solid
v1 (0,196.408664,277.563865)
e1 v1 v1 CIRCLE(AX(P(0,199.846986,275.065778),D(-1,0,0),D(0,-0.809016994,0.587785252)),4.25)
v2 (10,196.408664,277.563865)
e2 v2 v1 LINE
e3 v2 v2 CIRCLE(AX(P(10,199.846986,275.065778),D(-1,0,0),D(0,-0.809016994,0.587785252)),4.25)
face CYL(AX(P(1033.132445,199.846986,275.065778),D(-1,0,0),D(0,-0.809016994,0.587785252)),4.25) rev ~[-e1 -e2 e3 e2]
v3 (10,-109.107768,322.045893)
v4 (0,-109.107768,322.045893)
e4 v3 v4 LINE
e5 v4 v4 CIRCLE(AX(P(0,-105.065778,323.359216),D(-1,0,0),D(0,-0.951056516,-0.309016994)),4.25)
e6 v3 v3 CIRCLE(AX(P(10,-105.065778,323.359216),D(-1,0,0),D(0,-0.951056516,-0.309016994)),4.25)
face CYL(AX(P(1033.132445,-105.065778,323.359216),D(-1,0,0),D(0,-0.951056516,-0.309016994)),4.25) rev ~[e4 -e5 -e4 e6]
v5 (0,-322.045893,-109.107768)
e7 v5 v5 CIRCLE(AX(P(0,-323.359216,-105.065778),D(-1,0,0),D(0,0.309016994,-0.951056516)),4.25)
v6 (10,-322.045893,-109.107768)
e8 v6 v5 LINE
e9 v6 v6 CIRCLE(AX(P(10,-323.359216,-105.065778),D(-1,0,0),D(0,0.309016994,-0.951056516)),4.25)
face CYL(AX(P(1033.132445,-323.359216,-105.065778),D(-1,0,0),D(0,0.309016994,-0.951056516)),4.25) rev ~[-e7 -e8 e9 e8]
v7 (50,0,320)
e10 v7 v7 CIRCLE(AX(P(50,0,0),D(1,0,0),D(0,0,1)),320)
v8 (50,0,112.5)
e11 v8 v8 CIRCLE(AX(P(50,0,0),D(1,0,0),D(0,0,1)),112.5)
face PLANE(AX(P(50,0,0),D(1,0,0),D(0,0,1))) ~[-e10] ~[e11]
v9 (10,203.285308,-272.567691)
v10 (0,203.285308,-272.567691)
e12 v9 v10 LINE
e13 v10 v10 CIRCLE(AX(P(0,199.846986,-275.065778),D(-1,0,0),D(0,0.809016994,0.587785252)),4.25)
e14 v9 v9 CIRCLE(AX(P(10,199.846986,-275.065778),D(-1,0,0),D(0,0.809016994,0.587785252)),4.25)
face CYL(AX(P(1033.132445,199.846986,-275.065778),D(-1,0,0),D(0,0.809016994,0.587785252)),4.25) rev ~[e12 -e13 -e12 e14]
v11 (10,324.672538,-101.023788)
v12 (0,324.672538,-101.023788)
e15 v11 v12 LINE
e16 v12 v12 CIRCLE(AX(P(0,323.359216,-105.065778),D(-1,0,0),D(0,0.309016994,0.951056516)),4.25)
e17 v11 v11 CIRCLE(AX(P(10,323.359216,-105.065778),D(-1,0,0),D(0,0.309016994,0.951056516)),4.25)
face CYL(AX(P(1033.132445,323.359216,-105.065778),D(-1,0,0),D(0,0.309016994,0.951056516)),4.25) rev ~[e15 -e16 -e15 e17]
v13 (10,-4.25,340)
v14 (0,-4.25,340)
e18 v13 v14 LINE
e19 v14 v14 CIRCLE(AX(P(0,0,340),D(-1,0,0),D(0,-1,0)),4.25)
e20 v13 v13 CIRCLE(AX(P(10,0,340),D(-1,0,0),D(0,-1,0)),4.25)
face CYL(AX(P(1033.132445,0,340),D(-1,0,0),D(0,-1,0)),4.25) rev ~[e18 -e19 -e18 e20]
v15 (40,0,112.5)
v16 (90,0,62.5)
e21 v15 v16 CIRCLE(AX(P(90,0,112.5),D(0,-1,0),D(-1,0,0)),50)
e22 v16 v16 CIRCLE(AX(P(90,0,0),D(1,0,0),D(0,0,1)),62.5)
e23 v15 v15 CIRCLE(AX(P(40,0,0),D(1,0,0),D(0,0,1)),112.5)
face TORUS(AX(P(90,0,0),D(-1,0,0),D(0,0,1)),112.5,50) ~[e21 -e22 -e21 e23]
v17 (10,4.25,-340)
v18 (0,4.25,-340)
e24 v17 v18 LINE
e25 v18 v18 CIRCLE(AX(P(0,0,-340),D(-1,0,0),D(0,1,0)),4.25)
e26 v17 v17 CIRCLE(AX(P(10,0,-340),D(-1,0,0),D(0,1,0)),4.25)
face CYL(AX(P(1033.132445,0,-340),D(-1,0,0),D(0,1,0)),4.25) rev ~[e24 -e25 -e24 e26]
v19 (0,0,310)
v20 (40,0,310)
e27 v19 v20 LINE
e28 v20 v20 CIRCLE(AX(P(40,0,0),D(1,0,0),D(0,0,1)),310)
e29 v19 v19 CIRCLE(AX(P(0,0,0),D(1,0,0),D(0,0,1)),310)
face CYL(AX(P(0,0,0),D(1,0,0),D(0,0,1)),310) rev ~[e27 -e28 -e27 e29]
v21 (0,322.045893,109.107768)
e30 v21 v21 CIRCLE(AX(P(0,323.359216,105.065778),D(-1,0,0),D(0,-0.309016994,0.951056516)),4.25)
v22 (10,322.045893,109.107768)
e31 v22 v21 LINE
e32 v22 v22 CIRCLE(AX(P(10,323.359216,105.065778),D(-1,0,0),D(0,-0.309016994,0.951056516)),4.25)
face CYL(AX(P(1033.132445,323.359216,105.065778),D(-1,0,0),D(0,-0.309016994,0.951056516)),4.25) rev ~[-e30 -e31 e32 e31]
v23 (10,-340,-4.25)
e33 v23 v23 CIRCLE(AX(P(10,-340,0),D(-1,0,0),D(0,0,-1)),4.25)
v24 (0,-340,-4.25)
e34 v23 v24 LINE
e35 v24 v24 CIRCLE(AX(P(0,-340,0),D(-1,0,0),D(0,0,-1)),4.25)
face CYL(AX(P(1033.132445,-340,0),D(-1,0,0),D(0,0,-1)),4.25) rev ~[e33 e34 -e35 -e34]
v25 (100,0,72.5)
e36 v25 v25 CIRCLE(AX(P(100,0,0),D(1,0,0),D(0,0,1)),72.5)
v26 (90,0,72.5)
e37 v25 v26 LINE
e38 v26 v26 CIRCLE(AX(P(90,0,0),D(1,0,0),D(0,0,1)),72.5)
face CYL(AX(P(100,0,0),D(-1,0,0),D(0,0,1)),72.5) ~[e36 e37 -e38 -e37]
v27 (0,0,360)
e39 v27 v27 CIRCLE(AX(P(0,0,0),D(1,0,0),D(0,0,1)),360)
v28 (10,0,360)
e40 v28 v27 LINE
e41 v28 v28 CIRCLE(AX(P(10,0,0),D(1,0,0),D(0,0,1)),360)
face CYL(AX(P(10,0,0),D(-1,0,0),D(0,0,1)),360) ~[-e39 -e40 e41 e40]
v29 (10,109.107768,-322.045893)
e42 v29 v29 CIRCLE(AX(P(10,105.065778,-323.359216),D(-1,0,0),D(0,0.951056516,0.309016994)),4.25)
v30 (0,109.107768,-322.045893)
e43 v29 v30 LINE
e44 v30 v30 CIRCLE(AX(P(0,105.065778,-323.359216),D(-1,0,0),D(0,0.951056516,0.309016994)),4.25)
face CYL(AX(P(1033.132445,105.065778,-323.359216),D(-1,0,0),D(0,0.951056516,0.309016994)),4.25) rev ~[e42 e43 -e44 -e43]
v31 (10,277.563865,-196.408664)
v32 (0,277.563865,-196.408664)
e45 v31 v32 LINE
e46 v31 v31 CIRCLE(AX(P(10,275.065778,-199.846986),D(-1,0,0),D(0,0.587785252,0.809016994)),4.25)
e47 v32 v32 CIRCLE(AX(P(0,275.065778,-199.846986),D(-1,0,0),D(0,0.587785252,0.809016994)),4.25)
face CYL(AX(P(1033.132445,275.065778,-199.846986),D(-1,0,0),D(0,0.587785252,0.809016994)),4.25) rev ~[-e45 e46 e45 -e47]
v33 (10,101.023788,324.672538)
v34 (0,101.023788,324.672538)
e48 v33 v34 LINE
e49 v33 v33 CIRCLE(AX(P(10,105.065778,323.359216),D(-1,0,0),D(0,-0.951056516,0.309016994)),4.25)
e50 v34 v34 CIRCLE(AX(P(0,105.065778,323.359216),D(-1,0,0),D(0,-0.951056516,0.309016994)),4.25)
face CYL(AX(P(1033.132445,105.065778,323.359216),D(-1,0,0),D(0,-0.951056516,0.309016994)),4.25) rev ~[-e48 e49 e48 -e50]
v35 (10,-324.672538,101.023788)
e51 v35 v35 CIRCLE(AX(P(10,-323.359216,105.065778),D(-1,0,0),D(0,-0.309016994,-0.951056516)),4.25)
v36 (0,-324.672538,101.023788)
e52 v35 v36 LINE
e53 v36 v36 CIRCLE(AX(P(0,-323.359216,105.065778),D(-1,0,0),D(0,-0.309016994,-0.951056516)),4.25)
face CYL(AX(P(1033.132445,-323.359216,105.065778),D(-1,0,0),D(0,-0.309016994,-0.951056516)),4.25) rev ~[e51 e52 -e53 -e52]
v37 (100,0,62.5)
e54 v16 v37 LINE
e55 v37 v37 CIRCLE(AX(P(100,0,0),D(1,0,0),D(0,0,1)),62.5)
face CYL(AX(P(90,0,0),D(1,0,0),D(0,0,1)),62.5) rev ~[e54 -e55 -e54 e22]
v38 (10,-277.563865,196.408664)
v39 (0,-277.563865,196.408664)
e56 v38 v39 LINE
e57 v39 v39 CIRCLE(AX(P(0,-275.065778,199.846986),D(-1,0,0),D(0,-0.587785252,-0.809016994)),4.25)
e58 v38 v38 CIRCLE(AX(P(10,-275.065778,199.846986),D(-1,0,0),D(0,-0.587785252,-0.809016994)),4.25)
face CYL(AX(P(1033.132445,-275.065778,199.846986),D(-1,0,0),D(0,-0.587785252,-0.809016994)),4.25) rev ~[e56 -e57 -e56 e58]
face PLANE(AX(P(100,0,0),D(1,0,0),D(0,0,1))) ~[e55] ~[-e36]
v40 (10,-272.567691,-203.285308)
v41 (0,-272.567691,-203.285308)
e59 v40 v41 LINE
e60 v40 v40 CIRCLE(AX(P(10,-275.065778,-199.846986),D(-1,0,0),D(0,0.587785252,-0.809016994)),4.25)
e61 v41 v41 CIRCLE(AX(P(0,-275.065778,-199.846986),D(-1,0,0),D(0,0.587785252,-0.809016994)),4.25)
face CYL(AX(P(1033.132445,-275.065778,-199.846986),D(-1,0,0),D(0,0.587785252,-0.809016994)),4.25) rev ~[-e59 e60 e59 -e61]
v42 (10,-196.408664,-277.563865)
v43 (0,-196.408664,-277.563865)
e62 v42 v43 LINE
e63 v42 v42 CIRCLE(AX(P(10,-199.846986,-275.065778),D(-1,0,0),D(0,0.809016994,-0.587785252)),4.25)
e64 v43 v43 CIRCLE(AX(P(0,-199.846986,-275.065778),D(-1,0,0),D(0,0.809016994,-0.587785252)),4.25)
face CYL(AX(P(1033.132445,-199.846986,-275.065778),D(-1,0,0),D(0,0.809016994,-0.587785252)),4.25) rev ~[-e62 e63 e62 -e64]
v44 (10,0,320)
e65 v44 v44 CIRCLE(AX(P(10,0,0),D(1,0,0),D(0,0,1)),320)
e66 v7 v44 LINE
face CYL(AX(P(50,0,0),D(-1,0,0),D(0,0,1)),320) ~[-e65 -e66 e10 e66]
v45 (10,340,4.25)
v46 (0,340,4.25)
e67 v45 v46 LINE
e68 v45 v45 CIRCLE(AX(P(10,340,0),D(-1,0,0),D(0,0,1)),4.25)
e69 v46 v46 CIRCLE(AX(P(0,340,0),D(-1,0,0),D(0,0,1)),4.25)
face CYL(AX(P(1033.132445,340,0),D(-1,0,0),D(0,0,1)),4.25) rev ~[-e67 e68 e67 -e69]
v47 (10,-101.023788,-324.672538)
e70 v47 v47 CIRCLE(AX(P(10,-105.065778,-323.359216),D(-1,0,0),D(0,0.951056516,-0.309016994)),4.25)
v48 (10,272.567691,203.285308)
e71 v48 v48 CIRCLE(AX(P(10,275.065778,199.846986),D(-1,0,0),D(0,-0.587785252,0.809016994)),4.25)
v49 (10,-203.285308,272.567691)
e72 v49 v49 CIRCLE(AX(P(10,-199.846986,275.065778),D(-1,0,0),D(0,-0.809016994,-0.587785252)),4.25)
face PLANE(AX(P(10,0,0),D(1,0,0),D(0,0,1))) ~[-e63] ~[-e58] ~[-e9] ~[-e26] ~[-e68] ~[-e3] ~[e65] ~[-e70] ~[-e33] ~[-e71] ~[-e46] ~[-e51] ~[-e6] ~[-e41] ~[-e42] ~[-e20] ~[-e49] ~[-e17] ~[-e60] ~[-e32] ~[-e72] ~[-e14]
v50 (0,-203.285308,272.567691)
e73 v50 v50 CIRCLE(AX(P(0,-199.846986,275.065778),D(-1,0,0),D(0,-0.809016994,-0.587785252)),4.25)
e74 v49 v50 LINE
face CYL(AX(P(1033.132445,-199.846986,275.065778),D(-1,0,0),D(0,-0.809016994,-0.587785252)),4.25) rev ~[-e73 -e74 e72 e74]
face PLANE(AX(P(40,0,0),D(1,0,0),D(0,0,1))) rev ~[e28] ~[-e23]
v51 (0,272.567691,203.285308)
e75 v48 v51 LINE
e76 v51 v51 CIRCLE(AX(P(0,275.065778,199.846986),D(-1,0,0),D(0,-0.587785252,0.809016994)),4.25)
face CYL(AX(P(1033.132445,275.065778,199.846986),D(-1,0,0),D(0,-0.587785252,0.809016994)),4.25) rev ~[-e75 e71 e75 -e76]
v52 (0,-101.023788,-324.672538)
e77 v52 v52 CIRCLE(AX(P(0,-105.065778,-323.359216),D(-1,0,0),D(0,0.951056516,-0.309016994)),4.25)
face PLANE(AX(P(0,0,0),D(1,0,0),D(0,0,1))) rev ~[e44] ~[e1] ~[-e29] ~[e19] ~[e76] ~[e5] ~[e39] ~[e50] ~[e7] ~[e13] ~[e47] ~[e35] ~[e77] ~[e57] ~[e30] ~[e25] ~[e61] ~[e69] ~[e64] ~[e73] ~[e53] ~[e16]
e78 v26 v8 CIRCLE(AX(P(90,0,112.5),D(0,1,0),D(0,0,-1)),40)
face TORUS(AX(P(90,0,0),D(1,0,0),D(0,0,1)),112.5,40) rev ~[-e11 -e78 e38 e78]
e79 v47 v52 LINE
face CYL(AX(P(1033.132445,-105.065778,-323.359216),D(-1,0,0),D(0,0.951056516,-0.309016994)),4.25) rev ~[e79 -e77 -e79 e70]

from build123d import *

# Parameters (mm, degrees)
F3_D            = 8.5
F3_COPIES_COUNT = 20


# Not quite as in the source:
# - a pattern or mirror of a feature is missing from the dataset's text; its kind, count and spacing are read off the source's solid


with BuildPart() as f1:
    # F0 (on Front) → F1 (revolve)
    with BuildSketch(Plane.XZ):
        with BuildLine():
            Line((40, 310), (40, 112.5))
            ThreePointArc((40, 112.5), (54.6446609407, 77.1446609407), (90, 62.5))
            Line((90, 62.5), (100, 62.5))
            Line((100, 62.5), (100, 72.5))
            Line((100, 72.5), (90, 72.5))
            ThreePointArc((90, 72.5), (61.7157287525, 84.2157287525), (50, 112.5))
            Line((50, 112.5), (50, 320))
            Line((50, 320), (10, 320))
            Line((10, 320), (10, 360))
            Line((10, 360), (0, 360))
            Line((0, 360), (0, 310))
            Line((0, 310), (40, 310))
        make_face()
    revolve(axis=Axis((50, 0, 0), (1, 0, 0)))

    # F3 (through all)
    with Locations(Plane.YZ.offset(10)):
        with Locations((0, 340)):
            f3 = Hole(F3_D / 2)

    # F3_copies: F3 ×20 about axis
    f3_copies_axis = Axis((0, 0, 0), (1, 0, 0))
    for i in range(1, F3_COPIES_COUNT):
        add(f3.rotate(f3_copies_axis, i * 360 / F3_COPIES_COUNT), mode=Mode.SUBTRACT)


solid = f1.part
